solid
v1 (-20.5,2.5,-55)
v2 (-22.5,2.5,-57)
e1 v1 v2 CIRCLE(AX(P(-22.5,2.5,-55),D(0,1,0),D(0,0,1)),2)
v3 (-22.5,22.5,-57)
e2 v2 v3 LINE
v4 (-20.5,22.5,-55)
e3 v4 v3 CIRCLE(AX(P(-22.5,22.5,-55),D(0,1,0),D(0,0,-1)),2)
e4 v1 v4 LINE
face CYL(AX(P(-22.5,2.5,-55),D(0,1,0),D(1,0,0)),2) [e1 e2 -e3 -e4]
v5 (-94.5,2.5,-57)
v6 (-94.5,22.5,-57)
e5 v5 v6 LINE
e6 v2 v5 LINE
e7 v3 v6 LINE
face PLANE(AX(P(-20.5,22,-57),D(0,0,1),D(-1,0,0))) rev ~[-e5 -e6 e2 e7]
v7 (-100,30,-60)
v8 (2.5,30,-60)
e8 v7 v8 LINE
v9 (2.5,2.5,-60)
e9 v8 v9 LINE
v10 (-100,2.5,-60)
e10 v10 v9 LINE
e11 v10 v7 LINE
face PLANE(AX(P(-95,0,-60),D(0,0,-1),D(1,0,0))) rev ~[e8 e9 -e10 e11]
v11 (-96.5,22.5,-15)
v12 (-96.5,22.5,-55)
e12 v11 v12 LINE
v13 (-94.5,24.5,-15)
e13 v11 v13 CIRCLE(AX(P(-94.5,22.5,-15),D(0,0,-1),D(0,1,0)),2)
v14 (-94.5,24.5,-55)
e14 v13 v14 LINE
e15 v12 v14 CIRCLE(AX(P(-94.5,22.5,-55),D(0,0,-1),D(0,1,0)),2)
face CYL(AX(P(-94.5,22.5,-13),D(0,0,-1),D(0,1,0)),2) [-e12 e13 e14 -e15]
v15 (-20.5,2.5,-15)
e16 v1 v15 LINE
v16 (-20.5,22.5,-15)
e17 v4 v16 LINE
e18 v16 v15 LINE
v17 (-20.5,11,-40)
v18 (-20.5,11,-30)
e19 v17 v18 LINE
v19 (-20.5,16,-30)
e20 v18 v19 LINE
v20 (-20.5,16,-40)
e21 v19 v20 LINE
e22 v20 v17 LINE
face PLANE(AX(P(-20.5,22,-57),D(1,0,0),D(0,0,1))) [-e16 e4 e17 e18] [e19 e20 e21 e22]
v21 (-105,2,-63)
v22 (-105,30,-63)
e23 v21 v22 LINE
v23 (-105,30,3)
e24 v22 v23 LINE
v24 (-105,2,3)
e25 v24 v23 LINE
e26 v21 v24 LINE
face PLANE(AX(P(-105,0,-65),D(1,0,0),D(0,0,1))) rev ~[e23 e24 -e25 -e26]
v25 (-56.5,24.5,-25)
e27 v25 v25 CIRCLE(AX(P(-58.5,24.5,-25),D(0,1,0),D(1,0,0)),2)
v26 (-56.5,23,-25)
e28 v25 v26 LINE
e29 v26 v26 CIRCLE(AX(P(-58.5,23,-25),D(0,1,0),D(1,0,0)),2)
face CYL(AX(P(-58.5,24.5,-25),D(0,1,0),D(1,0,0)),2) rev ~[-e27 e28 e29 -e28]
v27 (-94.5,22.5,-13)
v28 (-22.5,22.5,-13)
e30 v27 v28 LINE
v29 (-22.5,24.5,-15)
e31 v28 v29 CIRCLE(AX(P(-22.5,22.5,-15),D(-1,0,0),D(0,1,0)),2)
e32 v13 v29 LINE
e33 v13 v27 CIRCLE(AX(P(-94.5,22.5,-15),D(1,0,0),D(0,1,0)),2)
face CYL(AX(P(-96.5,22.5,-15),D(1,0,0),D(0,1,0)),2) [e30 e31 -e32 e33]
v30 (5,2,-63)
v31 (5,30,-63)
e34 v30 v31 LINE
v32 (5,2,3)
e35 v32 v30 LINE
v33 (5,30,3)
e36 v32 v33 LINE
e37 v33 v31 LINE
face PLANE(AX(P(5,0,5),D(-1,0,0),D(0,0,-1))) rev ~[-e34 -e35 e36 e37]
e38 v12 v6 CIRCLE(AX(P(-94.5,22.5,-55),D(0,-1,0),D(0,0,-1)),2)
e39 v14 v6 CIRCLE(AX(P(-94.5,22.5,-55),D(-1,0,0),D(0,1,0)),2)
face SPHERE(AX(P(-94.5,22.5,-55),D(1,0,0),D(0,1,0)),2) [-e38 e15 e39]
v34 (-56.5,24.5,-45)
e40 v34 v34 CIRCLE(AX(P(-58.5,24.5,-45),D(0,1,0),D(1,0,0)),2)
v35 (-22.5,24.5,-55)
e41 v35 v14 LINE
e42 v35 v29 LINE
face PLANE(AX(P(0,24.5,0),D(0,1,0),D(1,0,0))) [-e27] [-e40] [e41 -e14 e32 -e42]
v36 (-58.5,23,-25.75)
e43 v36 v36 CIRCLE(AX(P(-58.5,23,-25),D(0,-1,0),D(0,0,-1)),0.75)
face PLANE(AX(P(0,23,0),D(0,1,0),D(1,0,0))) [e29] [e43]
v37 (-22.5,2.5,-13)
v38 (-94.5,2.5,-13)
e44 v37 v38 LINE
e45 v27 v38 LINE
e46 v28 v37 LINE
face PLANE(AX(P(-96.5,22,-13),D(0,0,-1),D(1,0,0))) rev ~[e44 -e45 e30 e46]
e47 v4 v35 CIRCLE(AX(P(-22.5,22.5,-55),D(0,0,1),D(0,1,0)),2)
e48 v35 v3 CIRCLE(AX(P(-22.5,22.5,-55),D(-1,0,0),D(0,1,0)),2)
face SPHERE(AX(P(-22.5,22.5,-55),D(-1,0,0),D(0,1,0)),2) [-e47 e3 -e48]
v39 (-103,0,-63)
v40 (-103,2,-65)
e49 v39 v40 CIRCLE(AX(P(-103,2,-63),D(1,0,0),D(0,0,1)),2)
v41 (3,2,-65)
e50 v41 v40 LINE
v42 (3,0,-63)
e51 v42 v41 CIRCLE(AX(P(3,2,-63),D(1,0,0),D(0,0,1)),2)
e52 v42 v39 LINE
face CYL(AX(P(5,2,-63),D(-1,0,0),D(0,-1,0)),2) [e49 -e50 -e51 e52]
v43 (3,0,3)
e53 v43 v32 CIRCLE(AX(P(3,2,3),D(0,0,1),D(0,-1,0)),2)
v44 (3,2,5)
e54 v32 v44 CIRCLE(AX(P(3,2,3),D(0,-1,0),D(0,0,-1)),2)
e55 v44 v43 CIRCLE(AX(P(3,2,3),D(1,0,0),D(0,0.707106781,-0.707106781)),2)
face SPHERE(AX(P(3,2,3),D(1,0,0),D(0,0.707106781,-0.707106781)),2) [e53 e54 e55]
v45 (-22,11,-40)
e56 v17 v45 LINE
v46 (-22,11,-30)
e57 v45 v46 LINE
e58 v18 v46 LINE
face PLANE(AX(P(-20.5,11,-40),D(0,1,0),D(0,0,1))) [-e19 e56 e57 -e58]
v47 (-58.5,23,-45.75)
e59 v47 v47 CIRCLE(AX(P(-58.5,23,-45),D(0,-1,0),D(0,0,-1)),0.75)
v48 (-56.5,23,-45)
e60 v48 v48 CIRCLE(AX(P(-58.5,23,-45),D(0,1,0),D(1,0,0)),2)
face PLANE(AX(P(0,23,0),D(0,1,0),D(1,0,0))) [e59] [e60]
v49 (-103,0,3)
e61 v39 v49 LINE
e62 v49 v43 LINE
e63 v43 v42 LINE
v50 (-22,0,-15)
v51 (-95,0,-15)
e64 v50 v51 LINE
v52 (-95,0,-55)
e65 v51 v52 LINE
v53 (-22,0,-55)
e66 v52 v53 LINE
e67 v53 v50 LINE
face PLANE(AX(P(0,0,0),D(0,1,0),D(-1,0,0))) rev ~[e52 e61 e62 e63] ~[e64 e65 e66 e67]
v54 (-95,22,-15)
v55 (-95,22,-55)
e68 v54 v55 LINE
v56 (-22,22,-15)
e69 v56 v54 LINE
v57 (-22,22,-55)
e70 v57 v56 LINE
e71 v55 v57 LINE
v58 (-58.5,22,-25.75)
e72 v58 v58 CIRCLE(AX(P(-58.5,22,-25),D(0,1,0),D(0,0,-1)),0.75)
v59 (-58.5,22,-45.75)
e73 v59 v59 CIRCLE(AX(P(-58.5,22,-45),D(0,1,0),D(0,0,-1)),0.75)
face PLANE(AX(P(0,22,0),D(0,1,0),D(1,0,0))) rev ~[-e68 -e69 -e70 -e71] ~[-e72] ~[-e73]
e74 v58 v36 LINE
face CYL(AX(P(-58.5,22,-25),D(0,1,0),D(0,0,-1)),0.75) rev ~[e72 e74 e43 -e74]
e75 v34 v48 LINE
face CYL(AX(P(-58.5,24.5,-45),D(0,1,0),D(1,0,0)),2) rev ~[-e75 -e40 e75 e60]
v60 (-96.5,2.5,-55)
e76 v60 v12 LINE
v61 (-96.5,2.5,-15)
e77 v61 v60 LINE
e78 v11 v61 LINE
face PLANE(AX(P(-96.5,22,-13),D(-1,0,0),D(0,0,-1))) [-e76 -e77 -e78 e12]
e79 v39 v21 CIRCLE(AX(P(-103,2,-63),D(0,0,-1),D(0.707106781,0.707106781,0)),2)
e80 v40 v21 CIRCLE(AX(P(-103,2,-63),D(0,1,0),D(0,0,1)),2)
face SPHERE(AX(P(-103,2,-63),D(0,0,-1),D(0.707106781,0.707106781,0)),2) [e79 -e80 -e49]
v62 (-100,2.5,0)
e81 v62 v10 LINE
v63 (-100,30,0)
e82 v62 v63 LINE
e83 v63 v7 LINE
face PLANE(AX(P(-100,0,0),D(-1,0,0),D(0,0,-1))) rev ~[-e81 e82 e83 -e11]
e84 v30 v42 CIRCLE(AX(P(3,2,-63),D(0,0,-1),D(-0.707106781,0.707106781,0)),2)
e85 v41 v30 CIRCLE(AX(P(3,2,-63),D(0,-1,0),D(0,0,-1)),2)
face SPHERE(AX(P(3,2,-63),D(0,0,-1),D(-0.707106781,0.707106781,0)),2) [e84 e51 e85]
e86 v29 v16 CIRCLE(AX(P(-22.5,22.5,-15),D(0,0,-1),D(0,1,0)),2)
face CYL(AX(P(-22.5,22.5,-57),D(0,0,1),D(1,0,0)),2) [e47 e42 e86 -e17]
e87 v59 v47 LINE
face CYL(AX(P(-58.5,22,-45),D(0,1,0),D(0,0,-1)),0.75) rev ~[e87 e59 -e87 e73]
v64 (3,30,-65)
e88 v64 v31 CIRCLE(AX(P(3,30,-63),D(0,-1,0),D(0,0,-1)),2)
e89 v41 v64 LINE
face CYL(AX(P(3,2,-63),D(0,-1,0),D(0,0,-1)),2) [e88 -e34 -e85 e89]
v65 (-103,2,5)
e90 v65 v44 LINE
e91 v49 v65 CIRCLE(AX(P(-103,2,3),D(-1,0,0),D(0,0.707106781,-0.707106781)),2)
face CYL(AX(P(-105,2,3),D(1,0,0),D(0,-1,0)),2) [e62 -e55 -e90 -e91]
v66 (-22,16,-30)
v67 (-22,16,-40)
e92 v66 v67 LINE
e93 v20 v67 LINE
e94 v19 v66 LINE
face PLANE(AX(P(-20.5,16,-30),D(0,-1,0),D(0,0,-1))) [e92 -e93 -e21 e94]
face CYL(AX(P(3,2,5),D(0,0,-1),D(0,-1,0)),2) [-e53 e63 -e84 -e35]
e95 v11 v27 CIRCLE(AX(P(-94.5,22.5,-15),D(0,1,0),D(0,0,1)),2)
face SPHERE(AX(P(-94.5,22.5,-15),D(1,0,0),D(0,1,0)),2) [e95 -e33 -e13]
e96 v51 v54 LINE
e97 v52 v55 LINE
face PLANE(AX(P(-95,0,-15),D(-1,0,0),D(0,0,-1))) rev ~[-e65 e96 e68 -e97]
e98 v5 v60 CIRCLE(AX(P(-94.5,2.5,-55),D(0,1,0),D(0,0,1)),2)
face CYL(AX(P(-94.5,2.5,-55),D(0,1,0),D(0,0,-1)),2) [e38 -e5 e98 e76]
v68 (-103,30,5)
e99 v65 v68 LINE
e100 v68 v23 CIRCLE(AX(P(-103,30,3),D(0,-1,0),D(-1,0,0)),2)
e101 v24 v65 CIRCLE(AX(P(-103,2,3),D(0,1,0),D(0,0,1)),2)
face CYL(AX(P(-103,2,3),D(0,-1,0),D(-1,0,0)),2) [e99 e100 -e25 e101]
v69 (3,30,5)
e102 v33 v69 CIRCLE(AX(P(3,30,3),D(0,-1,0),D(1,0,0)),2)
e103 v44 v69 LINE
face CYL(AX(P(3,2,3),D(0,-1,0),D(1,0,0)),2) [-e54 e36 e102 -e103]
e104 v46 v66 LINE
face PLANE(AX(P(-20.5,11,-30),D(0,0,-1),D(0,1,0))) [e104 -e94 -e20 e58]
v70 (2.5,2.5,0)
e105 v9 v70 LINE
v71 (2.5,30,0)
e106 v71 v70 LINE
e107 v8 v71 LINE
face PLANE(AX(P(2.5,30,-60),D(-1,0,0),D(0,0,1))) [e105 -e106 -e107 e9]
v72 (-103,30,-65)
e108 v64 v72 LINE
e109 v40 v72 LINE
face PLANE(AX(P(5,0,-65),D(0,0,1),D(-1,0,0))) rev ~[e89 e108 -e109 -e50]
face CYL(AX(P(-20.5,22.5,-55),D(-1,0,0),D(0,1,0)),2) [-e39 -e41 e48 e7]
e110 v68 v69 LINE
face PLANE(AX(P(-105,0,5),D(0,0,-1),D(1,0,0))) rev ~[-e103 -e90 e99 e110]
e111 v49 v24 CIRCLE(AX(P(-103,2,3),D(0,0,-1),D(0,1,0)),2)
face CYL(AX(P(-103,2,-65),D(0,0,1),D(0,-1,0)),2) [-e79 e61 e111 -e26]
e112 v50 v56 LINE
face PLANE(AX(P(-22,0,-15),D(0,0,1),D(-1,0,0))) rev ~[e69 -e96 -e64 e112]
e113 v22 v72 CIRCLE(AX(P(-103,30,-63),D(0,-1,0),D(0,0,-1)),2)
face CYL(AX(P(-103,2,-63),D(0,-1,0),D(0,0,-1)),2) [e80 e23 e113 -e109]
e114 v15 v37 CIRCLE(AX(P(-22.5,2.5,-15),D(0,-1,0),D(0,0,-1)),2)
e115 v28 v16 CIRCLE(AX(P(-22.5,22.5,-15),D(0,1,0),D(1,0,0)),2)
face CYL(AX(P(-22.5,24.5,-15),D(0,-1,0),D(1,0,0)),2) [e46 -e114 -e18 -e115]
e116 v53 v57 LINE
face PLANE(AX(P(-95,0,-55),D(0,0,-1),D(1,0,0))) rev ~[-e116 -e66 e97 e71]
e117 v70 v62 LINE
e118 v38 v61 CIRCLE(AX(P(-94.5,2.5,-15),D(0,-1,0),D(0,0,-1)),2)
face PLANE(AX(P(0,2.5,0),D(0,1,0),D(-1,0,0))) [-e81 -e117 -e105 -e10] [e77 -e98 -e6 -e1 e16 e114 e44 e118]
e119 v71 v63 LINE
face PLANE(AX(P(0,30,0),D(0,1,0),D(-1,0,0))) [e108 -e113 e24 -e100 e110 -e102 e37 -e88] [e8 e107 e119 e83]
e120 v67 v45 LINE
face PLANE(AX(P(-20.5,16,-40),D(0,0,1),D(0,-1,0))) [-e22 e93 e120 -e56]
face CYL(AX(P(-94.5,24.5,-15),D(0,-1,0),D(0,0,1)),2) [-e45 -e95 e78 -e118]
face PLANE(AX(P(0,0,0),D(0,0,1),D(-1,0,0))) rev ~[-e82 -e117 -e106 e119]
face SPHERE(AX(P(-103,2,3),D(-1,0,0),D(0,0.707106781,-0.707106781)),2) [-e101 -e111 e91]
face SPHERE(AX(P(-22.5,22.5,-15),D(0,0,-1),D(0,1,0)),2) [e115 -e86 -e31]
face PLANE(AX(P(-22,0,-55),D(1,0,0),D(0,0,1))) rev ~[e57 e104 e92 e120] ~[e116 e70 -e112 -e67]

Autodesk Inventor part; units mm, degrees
ref_plane "YZ Plane" through (0, 0, 0) normal (1, 0, 0) x (0, 1, 0)
ref_plane "XZ Plane" through (0, 0, 0) normal (0, 1, 0) x (-1, 0, 0)
ref_plane "XY Plane" through (0, 0, 0) normal (0, 0, 1) x (1, 0, 0)
sketch "Sketch1" plane through (0, 0, 0) normal (0, 1, 0) x (-1, 0, 0)
  line L0 (0, 0) -> (100, 0)
  line L1 (100, 0) -> (100, -60)
  line L2 (100, -60) -> (0, -60)
  line L3 (0, -60) -> (0, 0)
  line L4 (100, -52.4106) -> (95, -52.4106) construction
  line L5 (100, -52.4106) -> (105, -52.4106) construction
  line L6 (95, -60) -> (95, -55)
  line L7 (95, -55) -> (22, -55)
  line L8 (22, -55) -> (22, -15)
  line L9 (22, -15) -> (95, -15)
  line L10 (95, -15) -> (95, -55)
  line L11 (100, 0) -> (0, -60) construction
  line L12 (100, -60) -> (0, 0) construction
  line L13 (-5, -65) -> (105, -65)
  line L14 (105, -65) -> (105, 5)
  line L15 (105, 5) -> (-5, 5)
  line L16 (-5, 5) -> (-5, -65)
  line L17 (-5, -65) -> (105, 5) construction
  line L18 (105, -65) -> (-5, 5) construction
  line L19 (95, -15) -> (22, -55) construction
  line L20 (95, -55) -> (22, -15) construction
  line L21 (20.5, -13) -> (96.5, -13)
  line L22 (96.5, -13) -> (96.5, -57)
  line L23 (96.5, -57) -> (20.5, -57)
  line L24 (20.5, -57) -> (20.5, -13)
  line L25 (20.5, -13) -> (96.5, -57) construction
  line L26 (96.5, -13) -> (20.5, -57) construction
  point P0 (50, -30)
  point P1 (58.5, -35)
  dimension "d0" = 100
  dimension "d1" = 60
  dimension "d2" = 5
  dimension "d3" = 180
  dimension "d4" = 5
  dimension "d5" = 73
  dimension "d6" = 40
  dimension "d7" = 110
  dimension "d8" = 70
  dimension "d9" = 76
  dimension "d10" = 44
extrude "Extrusion1" add sketch "Sketch1" along normal blind 30 contours L16 L15 L14 L13
extrude "Extrusion2" add sketch "Sketch1" along normal blind 22 contours L21 L22 L23 L24
extrude "Extrusion3" add sketch "Sketch1" along normal blind 2.5 contours L0 L1 L2 L3
sketch "Sketch2" plane through (0, 22, 0) normal (0, 1, 0) x (1, 0, 0)
  line L0 (-20.5, 57) -> (-96.5, 57) projected
  line L1 (-96.5, 13) -> (-20.5, 13) projected
  line L2 (-96.5, 57) -> (-20.5, 57)
  line L3 (-20.5, 57) -> (-20.5, 13)
  line L4 (-20.5, 13) -> (-96.5, 13)
  line L5 (-96.5, 13) -> (-96.5, 57)
  point P0 (0, 0)
extrude "Extrusion4" add sketch "Sketch2" along normal blind 2.5
sketch "Sketch4" plane through (-20.5, 2.5, -13) normal (1, 0, 0) x (0, 0, -1)
  line L0 (-18, -2.5) -> (-18, 27.5) projected
  line L1 (-18, 27.5) -> (-13, 27.5) projected
  line L2 (-13, 27.5) -> (-13, 0) projected
  line L3 (-13, 0) -> (0, 0) projected
  line L4 (0, 0) -> (44, 0) projected
  line L5 (44, 0) -> (47, 0) projected
  line L6 (47, 0) -> (47, 27.5) projected
  line L7 (47, 27.5) -> (52, 27.5) projected
  line L8 (52, 27.5) -> (52, -2.5) projected
  line L9 (52, -2.5) -> (-18, -2.5) projected
  line L10 (0, 0) -> (0, 22) projected
  line L11 (0, 22) -> (44, 22) projected
  line L12 (44, 22) -> (44, 0) projected
  line L13 (0, 22) -> (44, 22) projected
  line L14 (44, 22) -> (0, 22) projected
  line L15 (-18, -2.5) -> (52, -2.5) projected
  line L16 (52, -2.5) -> (52, 27.5) projected
  line L17 (-18, 27.5) -> (52, 27.5) projected
  line L18 (-18, -2.5) -> (-18, 27.5) projected
  line L19 (0, 0) -> (44, 0) projected
  line L20 (44, 0) -> (44, 22) projected
  line L21 (0, 22) -> (44, 22) projected
  line L22 (0, 0) -> (0, 22) projected
  line L23 (44, 0) -> (44, 22) construction
  line L24 (44, 22) -> (0, 0) construction
  line L25 (44, 0) -> (0, 0) construction
  line L26 (44, 22) -> (0, 22) construction
  line L27 (44, 0) -> (0, 22) construction
  line L28 (27, 8.5) -> (17, 8.5)
  line L29 (17, 8.5) -> (17, 13.5)
  line L30 (17, 13.5) -> (27, 13.5)
  line L31 (27, 13.5) -> (27, 8.5)
  line L32 (27, 8.5) -> (17, 13.5) construction
  line L33 (17, 8.5) -> (27, 13.5) construction
  point P0 (-13, -2.5)
  point P1 (22, 11)
  dimension "d19" = 10
  dimension "d20" = 5
extrude "Extrusion5" cut sketch "Sketch4" against normal blind 10 contours L28 L29 L30 L31
fillet "Fillet1" radius 2 8 edges at (-58.5, 24.5, -57) (-20.5, 24.5, -35) (-58.5, 24.5, -13) (-96.5, 24.5, -35) (-20.5, 13.5, -13) (-20.5, 13.5, -57) (-96.5, 13.5, -13) (-96.5, 13.5, -57)
sketch "Sketch5" plane through (0, 22, 0) normal (0, -1, 0) x (1, 0, 0)
  line L0 (-22, -55) -> (-22, -15) construction
  line L1 (-94.5, -55) -> (-96.5, -55) construction
  line L2 (-58.5, -35) -> (-58.5, -55) construction
  line L3 (-58.5, -55) -> (-58.5, -45) construction
  line L4 (-58.5, -15) -> (-58.5, -25) construction
  point P0 (0, 0)
  dimension "d24" = 10
  dimension "d25" = 10
hole "Hole1" at (-58.5, 22, -45) at (-58.5, 22, -25) direction (0, 1, 0) diameter 1.5 depth 40 tip angle 118
sketch "Sketch6" plane through (0, 24.5, 0) normal (0, 1, 0) x (1, 0, 0)
  circle A0 centre (-58.5, 45) radius 0.75 projected
  circle A1 centre (-58.5, 45) radius 2
  circle A2 centre (-58.5, 25) radius 0.75 projected
  circle A3 centre (-58.5, 25) radius 2
  point P0 (0, 0)
  dimension "d33" = 4
  dimension "d34" = 4
extrude "Extrusion6" cut sketch "Sketch6" against normal blind 1.5
fillet "Fillet2" radius 2 4 edges at (-50, 0, -65) (-105, 0, -30) (-50, 0, 5) (5, 0, -30)
sketch "Sketch7" plane through (0, 30, 0) normal (0, 1, 0) x (1, 0, 0)
  line L0 (0, 60) -> (2.5, 60)
  line L1 (2.5, 60) -> (2.5, 0)
  line L2 (2.5, 0) -> (0, 0)
  line L3 (0, 0) -> (0, 60)
  dimension "d46" = 2.5
extrude "Extrusion7" cut sketch "Sketch7" against normal blind 27.5
fillet "Fillet3" radius 2 8 edges at (-104.4142, 0.5858, 4.4142) (-105, 16, 5) (4.4142, 0.5858, 4.4142) (5, 16, 5) (-104.4142, 0.5858, -64.4142) (-105, 16, -65) (4.4142, 0.5858, -64.4142) (5, 16, -65)
properties part number "abajo model2"
